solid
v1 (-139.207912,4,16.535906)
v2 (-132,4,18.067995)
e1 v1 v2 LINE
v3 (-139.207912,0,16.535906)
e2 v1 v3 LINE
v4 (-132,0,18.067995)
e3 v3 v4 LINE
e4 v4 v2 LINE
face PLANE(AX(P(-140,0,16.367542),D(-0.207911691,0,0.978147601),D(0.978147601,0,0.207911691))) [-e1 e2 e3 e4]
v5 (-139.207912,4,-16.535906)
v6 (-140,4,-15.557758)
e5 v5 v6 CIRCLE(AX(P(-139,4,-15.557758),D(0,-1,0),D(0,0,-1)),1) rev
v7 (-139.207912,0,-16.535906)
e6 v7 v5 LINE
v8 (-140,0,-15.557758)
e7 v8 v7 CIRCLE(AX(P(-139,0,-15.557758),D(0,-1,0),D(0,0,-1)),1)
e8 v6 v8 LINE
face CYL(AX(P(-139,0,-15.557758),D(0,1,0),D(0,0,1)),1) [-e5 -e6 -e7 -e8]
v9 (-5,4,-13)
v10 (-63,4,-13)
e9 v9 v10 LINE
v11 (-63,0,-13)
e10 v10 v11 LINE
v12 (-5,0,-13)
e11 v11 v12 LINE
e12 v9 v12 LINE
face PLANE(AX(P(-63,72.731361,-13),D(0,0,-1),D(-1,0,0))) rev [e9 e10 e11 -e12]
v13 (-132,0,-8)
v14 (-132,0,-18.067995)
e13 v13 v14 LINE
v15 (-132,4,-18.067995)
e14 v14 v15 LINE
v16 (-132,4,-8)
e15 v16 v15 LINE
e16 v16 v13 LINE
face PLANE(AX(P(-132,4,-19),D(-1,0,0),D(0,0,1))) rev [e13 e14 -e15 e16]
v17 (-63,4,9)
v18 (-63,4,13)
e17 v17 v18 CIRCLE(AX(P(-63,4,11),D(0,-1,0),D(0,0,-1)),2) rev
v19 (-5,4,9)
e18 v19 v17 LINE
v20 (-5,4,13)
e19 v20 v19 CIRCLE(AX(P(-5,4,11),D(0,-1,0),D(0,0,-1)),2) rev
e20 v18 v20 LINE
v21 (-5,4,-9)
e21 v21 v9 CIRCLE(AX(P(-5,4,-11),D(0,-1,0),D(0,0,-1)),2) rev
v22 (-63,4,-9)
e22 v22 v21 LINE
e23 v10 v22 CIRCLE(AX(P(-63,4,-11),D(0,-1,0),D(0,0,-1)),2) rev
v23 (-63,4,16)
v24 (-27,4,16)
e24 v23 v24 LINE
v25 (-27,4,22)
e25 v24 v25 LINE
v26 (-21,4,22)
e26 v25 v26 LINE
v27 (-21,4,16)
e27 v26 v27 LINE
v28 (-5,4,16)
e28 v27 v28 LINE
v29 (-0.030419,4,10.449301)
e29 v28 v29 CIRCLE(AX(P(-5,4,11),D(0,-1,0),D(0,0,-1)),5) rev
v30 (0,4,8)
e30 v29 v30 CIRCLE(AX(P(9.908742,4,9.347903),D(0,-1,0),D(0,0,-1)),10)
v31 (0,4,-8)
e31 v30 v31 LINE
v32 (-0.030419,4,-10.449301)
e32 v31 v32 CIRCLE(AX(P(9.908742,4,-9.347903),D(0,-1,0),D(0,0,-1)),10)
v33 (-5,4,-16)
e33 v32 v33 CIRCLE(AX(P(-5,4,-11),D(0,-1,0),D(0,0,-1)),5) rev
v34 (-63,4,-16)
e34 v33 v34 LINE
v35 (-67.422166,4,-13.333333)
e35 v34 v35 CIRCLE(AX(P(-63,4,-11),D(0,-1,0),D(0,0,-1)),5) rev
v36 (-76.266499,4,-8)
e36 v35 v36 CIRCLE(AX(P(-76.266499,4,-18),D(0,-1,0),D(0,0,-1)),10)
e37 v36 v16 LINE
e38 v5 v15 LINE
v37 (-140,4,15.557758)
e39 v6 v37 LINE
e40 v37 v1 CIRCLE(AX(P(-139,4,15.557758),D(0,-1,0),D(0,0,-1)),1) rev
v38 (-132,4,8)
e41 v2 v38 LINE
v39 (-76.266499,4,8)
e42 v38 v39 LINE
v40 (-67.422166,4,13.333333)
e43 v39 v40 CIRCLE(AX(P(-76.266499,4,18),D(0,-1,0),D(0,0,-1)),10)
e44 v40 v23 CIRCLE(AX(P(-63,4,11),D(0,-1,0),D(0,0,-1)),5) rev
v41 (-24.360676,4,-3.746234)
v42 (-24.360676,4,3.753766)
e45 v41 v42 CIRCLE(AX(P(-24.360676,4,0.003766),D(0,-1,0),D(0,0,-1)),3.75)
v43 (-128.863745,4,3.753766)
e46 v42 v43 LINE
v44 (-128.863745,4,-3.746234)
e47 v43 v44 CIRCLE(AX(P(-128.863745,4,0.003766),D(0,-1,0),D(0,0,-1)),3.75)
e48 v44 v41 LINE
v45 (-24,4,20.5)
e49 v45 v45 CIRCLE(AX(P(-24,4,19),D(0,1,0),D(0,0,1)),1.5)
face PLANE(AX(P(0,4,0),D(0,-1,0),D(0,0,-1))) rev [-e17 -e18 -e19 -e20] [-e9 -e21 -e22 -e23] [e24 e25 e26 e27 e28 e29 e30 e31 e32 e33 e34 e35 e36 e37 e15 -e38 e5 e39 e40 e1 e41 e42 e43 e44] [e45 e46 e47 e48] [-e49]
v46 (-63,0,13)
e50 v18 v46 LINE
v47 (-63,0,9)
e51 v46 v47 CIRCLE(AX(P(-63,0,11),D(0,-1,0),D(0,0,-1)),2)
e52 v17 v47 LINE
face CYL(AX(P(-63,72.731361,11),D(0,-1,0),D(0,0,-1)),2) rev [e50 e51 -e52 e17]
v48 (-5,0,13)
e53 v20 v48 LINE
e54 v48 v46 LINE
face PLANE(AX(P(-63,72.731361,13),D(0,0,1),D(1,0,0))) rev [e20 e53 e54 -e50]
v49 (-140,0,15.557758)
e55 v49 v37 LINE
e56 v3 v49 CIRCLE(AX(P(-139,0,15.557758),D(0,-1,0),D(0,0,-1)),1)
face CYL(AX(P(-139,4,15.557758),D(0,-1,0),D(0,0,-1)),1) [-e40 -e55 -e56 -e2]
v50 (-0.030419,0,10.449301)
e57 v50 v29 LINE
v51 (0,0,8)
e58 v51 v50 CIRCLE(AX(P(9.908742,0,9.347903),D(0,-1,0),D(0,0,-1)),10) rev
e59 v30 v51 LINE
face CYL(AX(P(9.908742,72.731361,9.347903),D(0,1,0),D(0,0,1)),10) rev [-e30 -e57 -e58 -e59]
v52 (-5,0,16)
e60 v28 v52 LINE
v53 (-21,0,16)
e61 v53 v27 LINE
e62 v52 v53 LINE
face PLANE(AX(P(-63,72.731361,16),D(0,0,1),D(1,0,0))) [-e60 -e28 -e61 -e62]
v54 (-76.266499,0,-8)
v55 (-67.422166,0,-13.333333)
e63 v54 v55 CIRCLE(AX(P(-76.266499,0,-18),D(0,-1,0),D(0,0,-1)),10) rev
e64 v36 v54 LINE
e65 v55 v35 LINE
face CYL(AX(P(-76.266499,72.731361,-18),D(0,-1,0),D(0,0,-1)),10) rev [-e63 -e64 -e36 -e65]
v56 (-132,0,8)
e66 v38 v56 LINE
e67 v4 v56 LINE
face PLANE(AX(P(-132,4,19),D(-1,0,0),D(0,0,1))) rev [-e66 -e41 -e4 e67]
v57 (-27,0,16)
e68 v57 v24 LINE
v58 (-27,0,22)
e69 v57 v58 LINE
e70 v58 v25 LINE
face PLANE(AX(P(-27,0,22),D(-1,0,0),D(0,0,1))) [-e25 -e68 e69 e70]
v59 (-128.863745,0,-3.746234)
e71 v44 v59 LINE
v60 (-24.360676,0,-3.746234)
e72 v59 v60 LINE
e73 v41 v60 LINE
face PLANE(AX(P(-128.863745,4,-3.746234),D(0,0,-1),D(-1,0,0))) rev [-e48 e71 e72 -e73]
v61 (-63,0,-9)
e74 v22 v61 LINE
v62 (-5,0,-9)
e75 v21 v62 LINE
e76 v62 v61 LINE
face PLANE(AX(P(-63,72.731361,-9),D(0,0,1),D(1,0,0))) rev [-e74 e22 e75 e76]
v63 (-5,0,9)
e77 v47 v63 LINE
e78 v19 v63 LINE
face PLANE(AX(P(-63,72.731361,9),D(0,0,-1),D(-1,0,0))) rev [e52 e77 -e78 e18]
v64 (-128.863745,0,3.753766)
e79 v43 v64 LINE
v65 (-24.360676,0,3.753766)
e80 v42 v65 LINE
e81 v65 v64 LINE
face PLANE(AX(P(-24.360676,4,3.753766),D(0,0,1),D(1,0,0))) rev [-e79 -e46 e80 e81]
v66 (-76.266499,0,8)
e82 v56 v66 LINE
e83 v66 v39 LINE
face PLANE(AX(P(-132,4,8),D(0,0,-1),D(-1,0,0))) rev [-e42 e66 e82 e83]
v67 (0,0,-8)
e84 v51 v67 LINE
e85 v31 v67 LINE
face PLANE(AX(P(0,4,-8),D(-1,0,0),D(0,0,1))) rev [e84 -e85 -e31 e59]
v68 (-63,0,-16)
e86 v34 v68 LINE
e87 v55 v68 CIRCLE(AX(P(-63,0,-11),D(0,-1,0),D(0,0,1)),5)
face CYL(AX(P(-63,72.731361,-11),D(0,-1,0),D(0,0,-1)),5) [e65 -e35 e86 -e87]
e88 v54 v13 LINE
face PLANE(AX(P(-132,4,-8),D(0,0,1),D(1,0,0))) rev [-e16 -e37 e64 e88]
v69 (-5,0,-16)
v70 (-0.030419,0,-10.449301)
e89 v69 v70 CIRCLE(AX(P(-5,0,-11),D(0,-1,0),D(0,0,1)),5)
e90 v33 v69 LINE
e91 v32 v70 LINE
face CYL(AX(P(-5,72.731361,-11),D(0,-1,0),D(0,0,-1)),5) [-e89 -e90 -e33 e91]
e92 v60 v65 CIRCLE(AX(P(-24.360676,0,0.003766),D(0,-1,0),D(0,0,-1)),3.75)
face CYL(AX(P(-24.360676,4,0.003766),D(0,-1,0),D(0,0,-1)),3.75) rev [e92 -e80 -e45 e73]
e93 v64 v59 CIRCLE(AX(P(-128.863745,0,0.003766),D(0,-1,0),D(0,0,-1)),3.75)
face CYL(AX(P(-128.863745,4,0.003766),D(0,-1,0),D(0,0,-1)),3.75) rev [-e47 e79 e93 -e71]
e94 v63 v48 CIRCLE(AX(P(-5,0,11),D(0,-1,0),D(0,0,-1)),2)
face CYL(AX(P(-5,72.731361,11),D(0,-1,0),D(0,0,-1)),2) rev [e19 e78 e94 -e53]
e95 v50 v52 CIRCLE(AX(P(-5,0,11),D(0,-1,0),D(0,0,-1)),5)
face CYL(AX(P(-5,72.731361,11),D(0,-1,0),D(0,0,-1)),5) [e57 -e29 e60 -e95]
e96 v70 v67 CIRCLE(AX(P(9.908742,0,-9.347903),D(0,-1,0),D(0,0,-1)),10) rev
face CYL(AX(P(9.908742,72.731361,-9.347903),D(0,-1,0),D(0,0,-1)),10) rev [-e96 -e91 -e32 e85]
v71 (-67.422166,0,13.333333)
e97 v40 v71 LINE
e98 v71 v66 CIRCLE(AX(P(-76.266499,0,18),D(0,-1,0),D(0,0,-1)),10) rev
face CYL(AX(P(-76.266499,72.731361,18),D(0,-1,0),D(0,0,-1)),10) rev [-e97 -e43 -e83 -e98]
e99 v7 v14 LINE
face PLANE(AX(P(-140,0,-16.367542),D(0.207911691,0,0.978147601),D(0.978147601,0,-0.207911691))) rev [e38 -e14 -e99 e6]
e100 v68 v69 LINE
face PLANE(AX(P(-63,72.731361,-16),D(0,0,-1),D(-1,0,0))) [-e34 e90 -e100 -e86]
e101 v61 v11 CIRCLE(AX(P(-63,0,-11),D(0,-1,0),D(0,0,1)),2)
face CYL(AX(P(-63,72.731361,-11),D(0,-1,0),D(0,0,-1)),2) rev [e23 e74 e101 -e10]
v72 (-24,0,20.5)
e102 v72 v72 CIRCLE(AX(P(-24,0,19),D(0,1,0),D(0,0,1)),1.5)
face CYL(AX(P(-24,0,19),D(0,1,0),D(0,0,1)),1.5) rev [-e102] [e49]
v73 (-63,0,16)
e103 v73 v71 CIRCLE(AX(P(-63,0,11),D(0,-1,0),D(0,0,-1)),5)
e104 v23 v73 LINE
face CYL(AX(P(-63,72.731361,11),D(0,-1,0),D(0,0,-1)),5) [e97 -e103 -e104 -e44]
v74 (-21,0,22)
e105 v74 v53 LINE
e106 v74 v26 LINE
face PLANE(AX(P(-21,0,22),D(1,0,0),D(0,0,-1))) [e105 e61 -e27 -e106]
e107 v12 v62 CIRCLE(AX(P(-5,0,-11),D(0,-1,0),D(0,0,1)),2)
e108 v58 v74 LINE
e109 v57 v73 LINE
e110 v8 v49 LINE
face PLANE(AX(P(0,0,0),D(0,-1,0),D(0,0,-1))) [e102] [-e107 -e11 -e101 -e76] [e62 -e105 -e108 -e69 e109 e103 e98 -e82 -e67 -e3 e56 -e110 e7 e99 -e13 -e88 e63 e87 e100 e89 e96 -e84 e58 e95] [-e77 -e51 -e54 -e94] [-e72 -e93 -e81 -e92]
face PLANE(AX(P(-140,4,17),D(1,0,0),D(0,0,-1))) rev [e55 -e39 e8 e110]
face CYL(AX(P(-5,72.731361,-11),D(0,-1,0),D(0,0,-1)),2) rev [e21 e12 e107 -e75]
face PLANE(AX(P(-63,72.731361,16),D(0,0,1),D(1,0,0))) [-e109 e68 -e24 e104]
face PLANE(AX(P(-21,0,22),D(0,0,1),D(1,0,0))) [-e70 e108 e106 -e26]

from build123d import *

# Parameters (mm, degrees)
EXTRUDE_1_DEPTH     = 4
EXTRUDE_2_DEPTH     = 4
FILLET_1_R          = 10
CUT_EXTRUDE_1_DEPTH = 142.340015565
SKETCH_4_W          = 6
SKETCH_4_H          = 6
EXTRUDE_7_DEPTH     = 4
SKETCH_6_R          = 1.5
CUT_EXTRUDE_4_DEPTH = 142.774468788
CUT_EXTRUDE_5_DEPTH = 142.774468788
FILLET_5_R          = 1
FILLET_6_R          = 1


with BuildPart() as part:
    # Эскиз1 → Бобышка-Вытянуть1 (new body)
    with BuildSketch(Plane(origin=(0, 0, 0), x_dir=(1, 0, 0), z_dir=(0, 1, 0))):
        Polygon((-140, -17), (-140, 17), (-138, 19), (-132, 19), (-132, 8), (0, 8), (0, -8), (-132, -8), (-132, -19), (-138, -19), align=None)
    extrude(amount=EXTRUDE_1_DEPTH)

    # Эскиз2 → Бобышка-Вытянуть2 (add)
    # profile 1 of 2: a face of its own
    with BuildSketch(Plane.XZ):
        with BuildLine():
            Line((-63, 16), (-5, 16))
            ThreePointArc((-5, 16), (0, 11), (-5, 6))
            Line((-5, 6), (-63, 6))
            ThreePointArc((-63, 6), (-68, 11), (-63, 16))
        make_face()
        with BuildLine():
            Line((-63, 13), (-5, 13))
            ThreePointArc((-5, 13), (-3, 11), (-5, 9))
            Line((-5, 9), (-63, 9))
            ThreePointArc((-63, 9), (-65, 11), (-63, 13))
        make_face(mode=Mode.SUBTRACT)
    # profile 2 of 2: a face of its own
    with BuildSketch(Plane.XZ):
        with BuildLine():
            Line((-63, -16), (-5, -16))
            ThreePointArc((-5, -16), (0, -11), (-5, -6))
            Line((-5, -6), (-63, -6))
            ThreePointArc((-63, -6), (-68, -11), (-63, -16))
        make_face()
        with BuildLine():
            Line((-63, -13), (-5, -13))
            ThreePointArc((-5, -13), (-3, -11), (-5, -9))
            Line((-5, -9), (-63, -9))
            ThreePointArc((-63, -9), (-65, -11), (-63, -13))
        make_face(mode=Mode.SUBTRACT)
    extrude(amount=-EXTRUDE_2_DEPTH)

    # Скругление1
    # the kernel refuses this fillet: 10 mm, written as the material it adds along each edge
    with BuildSketch(Plane(origin=(-1, 4, 8), x_dir=(1, 0, 0), z_dir=(0, -1, 0))) as fillet_1_piece_1:
        with BuildLine():
            CenterArc((10.90874153, 1.347902551), FILLET_1_R, 173.676623786, 14.069867748)
            Line((0.96958051, 2.44930085), (0.77079729, 2.471328816))
            ThreePointArc((0.77079729, 2.471328816), (0.463030841, 1.233264109), (-0.16, 0.12))
            Line((-0.16, 0.12), (0, -0.2))
            ThreePointArc((0, -0.2), (0.5, -0.2), (0.801825169, -0.026958051))
            Line((0.801825169, -0.026958051), (1, 0))
        make_face()
    extrude(amount=4)
    with BuildSketch(Plane(origin=(-67, 4, 8), x_dir=(-1, 0, 0), z_dir=(0, -1, 0))) as fillet_1_piece_2:
        with BuildLine():
            CenterArc((9.266499161, -10), FILLET_1_R, 90, 62.181860715)
            Line((0.422166387, -5.333333333), (0.245279732, -5.24))
            ThreePointArc((0.245279732, -5.24), (0.785032611, -2.621235013), (-0.16, -0.12))
            Line((-0.16, -0.12), (0, 0.2))
            Line((0, 0.2), (9.266499161, 0.2))
            Line((9.266499161, 0.2), (9.266499161, 0))
        make_face()
    extrude(amount=4)
    with BuildSketch(Plane(origin=(-1, 4, -8), x_dir=(1, 0, 0), z_dir=(0, -1, 0))) as fillet_1_piece_3:
        with BuildLine():
            CenterArc((10.90874153, -1.347902551), FILLET_1_R, 172.253508466, 14.069867748)
            Line((0.96958051, -2.44930085), (0.77079729, -2.471328816))
            ThreePointArc((0.77079729, -2.471328816), (0.463030841, -1.233264109), (-0.16, -0.12))
            Line((-0.16, -0.12), (0, 0.2))
            ThreePointArc((0, 0.2), (0.5, 0.2), (0.801825169, 0.026958051))
            Line((0.801825169, 0.026958051), (1, 0))
        make_face()
    extrude(amount=4)
    with BuildSketch(Plane(origin=(-67, 4, -8), x_dir=(-1, 0, 0), z_dir=(0, -1, 0))) as fillet_1_piece_4:
        with BuildLine():
            CenterArc((9.266499161, 10), FILLET_1_R, 207.818139285, 62.181860715)
            Line((0.422166387, 5.333333333), (0.245279732, 5.24))
            ThreePointArc((0.245279732, 5.24), (0.785032611, 2.621235013), (-0.16, 0.12))
            Line((-0.16, 0.12), (0, -0.2))
            Line((0, -0.2), (9.266499161, -0.2))
            Line((9.266499161, -0.2), (9.266499161, 0))
        make_face()
    extrude(amount=4)

    # Эскиз3 → Вырез-Вытянуть1 (cut, through all)
    with BuildSketch(Plane.XZ):
        with BuildLine():
            Line((-24.36067626, 3.753765504), (-128.863745401, 3.753765504))
            ThreePointArc((-128.863745401, 3.753765504), (-132.613745401, 0.003765504), (-128.863745401, -3.746234496))
            Line((-128.863745401, -3.746234496), (-24.36067626, -3.746234496))
            ThreePointArc((-24.36067626, -3.746234496), (-20.61067626, 0.003765504), (-24.36067626, 3.753765504))
        make_face()
    extrude(amount=-CUT_EXTRUDE_1_DEPTH, mode=Mode.SUBTRACT)

    # Эскиз4 → Бобышка-Вытянуть7 (add)
    with BuildSketch(Plane(origin=(0, 4, 0), x_dir=(1, 0, 0), z_dir=(0, 1, 0))):
        with Locations((-24, -19)):
            Rectangle(SKETCH_4_W, SKETCH_4_H)
    extrude(amount=-EXTRUDE_7_DEPTH)

    # Эскиз6 → Вырез-Вытянуть4 (cut, through all)
    with BuildSketch(Plane(origin=(0, 4, 0), x_dir=(1, 0, 0), z_dir=(0, 1, 0))):
        with Locations(Location((-24, -19, 0), (0, 0, 270))):
            Circle(SKETCH_6_R)
    extrude(amount=-CUT_EXTRUDE_4_DEPTH, mode=Mode.SUBTRACT)

    # Эскиз7 → Вырез-Вытянуть5 (cut, through all)
    with BuildSketch(Plane(origin=(0, 4, 0), x_dir=(1, 0, 0), z_dir=(0, 1, 0))):
        Polygon((-140, 16.36754244), (-131.974442882, 18.073427267), (-132, 19), (-138, 19), (-140, 17), align=None)
    cut_extrude_5 = extrude(amount=-CUT_EXTRUDE_5_DEPTH, mode=Mode.SUBTRACT)

    # Скругление5
    fillet_5_edges = [part.edges().sort_by_distance(p)[0] for p in [
        (-140, 2, -16.36754244),
    ]]
    fillet(fillet_5_edges, radius=FILLET_5_R)

    # Зеркальное отражение5: Вырез-Вытянуть5 across plane
    add(cut_extrude_5.mirror(Plane.XY), mode=Mode.SUBTRACT)

    # Скругление6
    fillet_6_edges = [part.edges().sort_by_distance(p)[0] for p in [
        (-140, 2, 16.36754244),
    ]]
    fillet(fillet_6_edges, radius=FILLET_6_R)


solid = part.part
